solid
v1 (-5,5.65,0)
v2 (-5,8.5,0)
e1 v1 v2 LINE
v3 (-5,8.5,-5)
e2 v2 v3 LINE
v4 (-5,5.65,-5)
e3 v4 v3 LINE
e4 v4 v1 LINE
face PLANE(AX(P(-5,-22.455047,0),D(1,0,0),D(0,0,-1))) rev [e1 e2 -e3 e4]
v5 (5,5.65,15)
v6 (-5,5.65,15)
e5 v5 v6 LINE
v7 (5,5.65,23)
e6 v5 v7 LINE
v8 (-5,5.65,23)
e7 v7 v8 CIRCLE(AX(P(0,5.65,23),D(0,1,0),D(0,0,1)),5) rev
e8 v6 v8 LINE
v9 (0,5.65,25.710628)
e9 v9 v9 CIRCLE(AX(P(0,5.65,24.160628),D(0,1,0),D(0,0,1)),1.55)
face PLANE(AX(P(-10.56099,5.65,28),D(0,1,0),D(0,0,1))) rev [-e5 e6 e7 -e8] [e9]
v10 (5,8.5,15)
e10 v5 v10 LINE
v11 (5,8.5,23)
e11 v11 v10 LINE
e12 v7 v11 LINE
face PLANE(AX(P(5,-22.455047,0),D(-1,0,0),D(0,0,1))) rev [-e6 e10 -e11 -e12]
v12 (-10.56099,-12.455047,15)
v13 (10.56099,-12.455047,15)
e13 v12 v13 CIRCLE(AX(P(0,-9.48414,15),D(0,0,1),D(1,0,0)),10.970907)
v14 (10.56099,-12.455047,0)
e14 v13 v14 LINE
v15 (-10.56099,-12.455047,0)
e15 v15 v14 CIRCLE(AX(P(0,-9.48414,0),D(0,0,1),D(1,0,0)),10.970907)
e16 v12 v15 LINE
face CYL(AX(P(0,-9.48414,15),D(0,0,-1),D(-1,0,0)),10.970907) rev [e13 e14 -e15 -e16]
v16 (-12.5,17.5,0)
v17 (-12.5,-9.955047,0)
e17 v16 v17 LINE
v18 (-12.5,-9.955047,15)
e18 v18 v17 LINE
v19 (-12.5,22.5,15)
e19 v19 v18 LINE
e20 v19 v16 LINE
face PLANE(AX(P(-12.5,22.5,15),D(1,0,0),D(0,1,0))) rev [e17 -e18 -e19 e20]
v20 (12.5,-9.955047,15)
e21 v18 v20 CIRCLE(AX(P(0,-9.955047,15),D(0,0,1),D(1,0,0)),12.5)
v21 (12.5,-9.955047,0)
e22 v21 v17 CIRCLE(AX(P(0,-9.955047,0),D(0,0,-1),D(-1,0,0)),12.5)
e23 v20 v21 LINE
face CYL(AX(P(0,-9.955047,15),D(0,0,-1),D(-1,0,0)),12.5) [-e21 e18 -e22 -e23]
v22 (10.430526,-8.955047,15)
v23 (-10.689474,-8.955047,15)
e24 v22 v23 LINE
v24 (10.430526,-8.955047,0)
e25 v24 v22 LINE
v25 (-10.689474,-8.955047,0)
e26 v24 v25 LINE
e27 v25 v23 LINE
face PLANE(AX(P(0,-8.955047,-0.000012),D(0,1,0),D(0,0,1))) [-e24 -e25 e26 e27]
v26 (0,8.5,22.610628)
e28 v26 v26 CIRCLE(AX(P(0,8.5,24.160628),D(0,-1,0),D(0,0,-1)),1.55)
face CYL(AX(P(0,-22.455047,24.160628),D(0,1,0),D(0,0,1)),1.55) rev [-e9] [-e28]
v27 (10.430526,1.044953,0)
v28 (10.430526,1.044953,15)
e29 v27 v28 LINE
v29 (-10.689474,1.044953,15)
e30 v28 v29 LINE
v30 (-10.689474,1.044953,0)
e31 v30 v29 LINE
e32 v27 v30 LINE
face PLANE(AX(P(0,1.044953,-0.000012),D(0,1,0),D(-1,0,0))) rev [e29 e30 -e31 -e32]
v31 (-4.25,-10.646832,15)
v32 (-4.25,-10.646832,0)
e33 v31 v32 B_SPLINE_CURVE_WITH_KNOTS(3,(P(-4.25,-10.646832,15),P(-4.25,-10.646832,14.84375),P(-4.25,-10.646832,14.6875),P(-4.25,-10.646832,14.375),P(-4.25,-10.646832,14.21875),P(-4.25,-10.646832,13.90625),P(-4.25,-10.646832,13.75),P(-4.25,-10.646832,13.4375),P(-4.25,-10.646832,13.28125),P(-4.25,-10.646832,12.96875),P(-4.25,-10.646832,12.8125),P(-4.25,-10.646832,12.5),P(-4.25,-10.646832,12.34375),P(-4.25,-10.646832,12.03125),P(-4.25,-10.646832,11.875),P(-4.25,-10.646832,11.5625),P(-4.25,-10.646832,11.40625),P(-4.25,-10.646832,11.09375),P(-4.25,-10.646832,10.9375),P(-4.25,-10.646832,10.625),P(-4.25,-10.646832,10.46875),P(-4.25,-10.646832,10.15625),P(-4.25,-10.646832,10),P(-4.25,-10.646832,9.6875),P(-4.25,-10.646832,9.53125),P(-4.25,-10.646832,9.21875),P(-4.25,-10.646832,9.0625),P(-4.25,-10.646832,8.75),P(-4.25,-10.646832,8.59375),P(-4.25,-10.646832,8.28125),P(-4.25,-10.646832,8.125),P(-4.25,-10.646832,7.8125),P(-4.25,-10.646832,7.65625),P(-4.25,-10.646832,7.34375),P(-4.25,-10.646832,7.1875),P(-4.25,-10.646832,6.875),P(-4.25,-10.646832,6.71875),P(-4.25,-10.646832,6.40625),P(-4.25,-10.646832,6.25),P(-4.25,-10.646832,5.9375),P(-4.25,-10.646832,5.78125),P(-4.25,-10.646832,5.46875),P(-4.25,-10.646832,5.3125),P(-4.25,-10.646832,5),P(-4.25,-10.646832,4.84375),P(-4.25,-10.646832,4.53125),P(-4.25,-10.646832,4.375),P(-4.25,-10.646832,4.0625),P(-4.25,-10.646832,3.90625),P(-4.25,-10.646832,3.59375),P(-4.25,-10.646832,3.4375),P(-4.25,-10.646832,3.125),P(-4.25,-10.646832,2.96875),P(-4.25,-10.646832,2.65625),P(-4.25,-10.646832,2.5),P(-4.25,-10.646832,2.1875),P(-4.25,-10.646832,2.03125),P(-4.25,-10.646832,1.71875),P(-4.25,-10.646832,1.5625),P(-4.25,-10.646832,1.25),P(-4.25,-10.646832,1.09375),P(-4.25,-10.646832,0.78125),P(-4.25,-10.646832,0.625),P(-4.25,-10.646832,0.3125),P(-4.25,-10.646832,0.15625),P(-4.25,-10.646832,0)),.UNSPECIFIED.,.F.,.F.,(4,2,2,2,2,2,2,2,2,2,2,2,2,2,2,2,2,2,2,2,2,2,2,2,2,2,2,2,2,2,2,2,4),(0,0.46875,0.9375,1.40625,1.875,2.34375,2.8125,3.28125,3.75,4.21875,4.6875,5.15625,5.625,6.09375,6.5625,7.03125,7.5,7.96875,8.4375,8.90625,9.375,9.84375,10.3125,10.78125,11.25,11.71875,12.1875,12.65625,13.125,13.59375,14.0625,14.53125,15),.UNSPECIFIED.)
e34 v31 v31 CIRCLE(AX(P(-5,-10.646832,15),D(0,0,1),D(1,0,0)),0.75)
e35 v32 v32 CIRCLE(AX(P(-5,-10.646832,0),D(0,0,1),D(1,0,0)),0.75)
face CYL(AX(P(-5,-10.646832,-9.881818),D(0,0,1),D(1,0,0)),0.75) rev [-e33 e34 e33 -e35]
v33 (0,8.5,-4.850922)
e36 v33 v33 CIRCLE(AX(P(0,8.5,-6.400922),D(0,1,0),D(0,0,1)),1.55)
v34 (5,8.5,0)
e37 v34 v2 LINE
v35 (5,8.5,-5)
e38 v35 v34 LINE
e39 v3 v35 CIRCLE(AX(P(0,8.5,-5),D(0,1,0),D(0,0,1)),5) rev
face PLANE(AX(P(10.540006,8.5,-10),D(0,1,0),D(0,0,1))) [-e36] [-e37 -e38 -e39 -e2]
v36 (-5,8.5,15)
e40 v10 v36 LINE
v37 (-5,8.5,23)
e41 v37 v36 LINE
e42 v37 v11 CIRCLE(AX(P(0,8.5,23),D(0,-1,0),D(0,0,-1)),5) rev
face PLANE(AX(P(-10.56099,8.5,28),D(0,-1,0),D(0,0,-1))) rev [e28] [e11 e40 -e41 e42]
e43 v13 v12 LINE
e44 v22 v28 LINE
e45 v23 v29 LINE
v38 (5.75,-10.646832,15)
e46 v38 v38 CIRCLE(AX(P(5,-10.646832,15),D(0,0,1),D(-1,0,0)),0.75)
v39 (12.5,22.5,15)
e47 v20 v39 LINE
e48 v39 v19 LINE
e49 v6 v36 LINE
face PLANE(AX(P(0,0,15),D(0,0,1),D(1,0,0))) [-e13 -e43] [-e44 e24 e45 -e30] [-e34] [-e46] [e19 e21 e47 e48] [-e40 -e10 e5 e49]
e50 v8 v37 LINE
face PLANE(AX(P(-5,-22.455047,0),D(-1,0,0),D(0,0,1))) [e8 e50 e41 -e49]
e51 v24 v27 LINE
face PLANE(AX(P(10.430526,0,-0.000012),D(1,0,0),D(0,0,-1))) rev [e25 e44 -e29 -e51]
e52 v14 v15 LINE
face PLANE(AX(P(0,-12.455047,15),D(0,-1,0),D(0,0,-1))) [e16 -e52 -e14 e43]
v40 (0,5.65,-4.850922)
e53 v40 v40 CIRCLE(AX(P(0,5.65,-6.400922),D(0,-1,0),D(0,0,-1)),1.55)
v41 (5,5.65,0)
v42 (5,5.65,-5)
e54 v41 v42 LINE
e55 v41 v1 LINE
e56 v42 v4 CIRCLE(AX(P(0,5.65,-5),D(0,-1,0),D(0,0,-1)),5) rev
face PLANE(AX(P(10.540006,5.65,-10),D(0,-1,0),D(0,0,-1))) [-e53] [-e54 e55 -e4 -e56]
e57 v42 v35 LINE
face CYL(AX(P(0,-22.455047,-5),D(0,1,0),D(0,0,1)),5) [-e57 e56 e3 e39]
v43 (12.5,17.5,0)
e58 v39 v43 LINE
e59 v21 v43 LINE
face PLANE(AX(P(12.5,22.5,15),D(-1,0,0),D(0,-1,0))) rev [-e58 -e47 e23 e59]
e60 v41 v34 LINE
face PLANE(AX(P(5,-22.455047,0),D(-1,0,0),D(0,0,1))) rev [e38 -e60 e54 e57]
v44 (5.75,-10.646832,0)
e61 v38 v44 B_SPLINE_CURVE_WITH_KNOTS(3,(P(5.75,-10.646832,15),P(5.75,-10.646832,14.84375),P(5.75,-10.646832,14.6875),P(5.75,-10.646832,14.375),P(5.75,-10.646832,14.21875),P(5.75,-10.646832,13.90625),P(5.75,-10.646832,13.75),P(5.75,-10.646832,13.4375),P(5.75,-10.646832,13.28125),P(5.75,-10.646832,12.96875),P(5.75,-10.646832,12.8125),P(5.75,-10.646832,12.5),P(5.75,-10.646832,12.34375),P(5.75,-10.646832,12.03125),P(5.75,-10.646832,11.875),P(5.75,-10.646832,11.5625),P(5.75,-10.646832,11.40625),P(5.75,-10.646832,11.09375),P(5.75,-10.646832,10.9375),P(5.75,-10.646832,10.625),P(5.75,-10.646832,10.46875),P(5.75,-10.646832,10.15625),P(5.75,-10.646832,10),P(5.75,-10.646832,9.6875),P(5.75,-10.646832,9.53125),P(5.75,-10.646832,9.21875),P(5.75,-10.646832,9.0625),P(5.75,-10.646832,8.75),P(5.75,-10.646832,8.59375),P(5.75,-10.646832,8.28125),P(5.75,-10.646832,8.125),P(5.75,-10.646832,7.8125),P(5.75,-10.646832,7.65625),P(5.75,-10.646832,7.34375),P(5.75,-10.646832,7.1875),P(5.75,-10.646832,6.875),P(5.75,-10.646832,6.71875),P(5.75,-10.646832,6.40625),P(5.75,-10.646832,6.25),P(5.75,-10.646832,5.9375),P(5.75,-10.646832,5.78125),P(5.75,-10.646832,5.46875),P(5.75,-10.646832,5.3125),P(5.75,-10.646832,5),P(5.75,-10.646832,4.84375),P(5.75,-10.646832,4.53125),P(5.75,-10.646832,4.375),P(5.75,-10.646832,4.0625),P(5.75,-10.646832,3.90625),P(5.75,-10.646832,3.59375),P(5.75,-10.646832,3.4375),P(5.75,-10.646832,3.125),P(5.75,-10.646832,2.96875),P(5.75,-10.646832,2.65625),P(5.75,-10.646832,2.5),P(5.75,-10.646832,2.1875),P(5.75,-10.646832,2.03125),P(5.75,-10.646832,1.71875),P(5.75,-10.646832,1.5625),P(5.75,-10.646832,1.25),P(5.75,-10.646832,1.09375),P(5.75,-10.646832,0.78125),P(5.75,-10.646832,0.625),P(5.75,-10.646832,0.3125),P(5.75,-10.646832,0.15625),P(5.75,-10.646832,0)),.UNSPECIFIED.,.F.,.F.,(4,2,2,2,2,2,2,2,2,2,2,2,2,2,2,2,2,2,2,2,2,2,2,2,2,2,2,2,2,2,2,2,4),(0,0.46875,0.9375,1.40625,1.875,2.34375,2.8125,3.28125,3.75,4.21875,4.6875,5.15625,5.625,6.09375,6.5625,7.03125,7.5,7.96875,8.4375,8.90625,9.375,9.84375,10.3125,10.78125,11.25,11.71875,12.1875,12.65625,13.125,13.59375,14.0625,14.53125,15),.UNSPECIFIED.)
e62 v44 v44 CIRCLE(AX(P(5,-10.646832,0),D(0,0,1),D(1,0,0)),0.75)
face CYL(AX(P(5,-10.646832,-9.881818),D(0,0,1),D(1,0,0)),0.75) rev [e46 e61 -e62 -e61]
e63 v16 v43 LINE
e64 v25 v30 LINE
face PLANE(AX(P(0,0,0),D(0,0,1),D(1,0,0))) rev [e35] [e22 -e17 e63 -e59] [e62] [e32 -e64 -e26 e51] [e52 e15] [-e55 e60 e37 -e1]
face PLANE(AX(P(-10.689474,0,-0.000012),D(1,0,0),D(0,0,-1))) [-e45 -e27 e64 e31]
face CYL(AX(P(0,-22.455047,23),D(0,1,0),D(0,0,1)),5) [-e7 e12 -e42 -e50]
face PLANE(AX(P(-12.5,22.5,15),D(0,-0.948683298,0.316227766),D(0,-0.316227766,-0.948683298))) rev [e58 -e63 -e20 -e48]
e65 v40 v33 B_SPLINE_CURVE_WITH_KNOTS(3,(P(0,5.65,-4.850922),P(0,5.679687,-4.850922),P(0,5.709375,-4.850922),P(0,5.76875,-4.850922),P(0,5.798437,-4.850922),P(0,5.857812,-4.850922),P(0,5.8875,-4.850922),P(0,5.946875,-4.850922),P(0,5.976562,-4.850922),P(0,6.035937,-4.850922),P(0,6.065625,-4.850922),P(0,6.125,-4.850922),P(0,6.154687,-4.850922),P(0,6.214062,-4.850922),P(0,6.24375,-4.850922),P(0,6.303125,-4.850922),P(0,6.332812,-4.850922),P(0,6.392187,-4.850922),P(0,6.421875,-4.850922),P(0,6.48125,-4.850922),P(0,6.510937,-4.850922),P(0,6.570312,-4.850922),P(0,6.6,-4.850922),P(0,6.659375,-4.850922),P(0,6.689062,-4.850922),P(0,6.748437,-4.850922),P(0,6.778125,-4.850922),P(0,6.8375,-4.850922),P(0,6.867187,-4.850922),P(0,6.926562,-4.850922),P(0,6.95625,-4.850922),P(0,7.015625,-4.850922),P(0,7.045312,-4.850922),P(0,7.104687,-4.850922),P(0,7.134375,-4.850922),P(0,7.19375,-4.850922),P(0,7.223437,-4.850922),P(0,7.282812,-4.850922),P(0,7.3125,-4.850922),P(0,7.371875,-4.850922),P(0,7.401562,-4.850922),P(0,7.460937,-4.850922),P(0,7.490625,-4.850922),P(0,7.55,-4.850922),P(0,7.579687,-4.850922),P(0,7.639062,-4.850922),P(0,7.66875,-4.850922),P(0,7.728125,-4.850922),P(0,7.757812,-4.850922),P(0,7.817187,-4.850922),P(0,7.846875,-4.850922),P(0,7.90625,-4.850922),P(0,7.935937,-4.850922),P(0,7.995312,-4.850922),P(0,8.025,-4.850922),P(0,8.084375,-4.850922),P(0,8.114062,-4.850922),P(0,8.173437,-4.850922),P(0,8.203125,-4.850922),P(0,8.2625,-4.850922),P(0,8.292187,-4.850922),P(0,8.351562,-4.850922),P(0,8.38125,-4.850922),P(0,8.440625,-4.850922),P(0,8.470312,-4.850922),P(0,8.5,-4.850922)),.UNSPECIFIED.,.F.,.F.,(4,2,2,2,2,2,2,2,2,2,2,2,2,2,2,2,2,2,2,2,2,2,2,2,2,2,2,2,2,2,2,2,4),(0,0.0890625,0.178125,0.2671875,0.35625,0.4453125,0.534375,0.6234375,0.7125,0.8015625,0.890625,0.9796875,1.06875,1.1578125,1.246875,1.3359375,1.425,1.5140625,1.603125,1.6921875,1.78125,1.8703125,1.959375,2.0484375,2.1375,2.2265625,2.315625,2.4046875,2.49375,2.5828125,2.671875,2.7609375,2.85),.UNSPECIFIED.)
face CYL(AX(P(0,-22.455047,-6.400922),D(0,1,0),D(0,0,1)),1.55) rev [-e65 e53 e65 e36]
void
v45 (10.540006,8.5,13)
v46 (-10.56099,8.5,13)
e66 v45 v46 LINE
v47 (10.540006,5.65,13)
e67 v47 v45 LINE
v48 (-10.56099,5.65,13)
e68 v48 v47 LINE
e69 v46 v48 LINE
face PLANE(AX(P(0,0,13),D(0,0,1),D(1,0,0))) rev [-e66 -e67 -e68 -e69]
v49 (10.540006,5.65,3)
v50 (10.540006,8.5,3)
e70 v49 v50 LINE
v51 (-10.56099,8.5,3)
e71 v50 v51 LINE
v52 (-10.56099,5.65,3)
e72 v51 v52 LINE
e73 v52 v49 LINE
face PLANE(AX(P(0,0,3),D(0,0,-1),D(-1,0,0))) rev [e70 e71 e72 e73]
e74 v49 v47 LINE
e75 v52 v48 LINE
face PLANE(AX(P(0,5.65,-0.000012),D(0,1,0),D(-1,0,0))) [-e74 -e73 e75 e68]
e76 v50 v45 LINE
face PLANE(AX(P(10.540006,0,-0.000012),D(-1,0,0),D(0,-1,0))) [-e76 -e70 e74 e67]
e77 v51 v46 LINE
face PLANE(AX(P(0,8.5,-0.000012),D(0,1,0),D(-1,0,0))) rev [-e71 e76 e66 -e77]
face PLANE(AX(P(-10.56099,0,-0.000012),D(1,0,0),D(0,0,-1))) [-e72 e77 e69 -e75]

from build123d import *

# Parameters (mm, degrees)
SKETCH1_W                = 25
SKETCH1_H                = 45
BOSS_EXTRUDE1_DEPTH      = 15
BOSS_EXTRUDE2_START      = -10.05
BOSS_EXTRUDE2_DEPTH      = 20.1
CUT_EXTRUDE1_DEPTH       = 30.79093822
CUT_EXTRUDE1_DEPTH_BACK  = 30.79093822
CUT_EXTRUDE3_DEPTH       = 30.79093822
CUT_EXTRUDE3_DEPTH_BACK  = 30.79093822
CUT_EXTRUDE7_DEPTH       = 30.79093822
CUT_EXTRUDE9_OUTLINE_W   = 21.12
CUT_EXTRUDE9_OUTLINE_H   = 10
CUT_EXTRUDE9_OUTLINE_W_2 = 21.100995898
CUT_EXTRUDE9_OUTLINE_H_2 = 2.85
CUT_EXTRUDE9_DEPTH       = 15
SKETCH8_W                = 7
SKETCH8_H                = 2.5
BOSS_EXTRUDE3_DEPTH      = 10
CUT_EXTRUDE11_DEPTH      = 30.79093822
CUT_EXTRUDE11_DEPTH_BACK = 30.79093822
CUT_EXTRUDE12_DEPTH      = 30.79093822
CUT_EXTRUDE12_DEPTH_BACK = 30.79093822
SKETCH10_R               = 1.6
CUT_EXTRUDE14_DEPTH      = 30.79093822
CUT_EXTRUDE14_DEPTH_BACK = 30.79093822
SKETCH12_R               = 0.75
CUT_EXTRUDE15_DEPTH      = 30.79093822
CUT_EXTRUDE15_DEPTH_BACK = 30.79093822
SKETCH15_W               = 15.416816506
SKETCH15_H               = 10.763431908
BOSS_EXTRUDE5_START      = 3
SKETCH16_W               = 21.100995898
SKETCH16_H               = 2.85
BOSS_EXTRUDE5_DEPTH      = 13
CUT_EXTRUDE17_DEPTH      = 30.79093822
CUT_EXTRUDE17_DEPTH_BACK = 30.79093822
SKETCH17_R               = 1.55
BOSS_EXTRUDE6_START      = 13
SKETCH18_W               = 21.100995898
SKETCH18_H               = 2.85
BOSS_EXTRUDE6_DEPTH      = 15
CUT_EXTRUDE18_DEPTH      = 39.032880511
CUT_EXTRUDE18_DEPTH_BACK = 39.032880511
SKETCH19_R               = 1.55


# Read off the part's stored shape, not the designer's step: Cut-Extrude9
with BuildPart() as part:
    # Sketch1 → Boss-Extrude1 (new body)
    with BuildSketch(Plane.XY):
        Rectangle(SKETCH1_W, SKETCH1_H)
    extrude(amount=BOSS_EXTRUDE1_DEPTH)

    # Sketch2 → Boss-Extrude2 (add)
    with BuildSketch(Plane(origin=(0, 0, 0), x_dir=(0, 0, -1), z_dir=(1, 0, 0)).offset(BOSS_EXTRUDE2_START)):
        Polygon((-15, 22.5), (-15, 21.775067879), (0, 22.5), align=None)
    extrude(amount=BOSS_EXTRUDE2_DEPTH)

    # Sketch3 → Cut-Extrude1 (cut, two sides: drawn at the far end of the back side and taken through both)
    with BuildSketch(Plane(origin=(0, 0, 0), x_dir=(0, 0, -1), z_dir=(1, 0, 0)).offset(-CUT_EXTRUDE1_DEPTH_BACK)):
        Polygon((-15, 22.5), (0, 17.5), (5.857225601, 19.69853849), (5.857225601, 28.456051758), (-15, 27.780768739), align=None)
    extrude(amount=CUT_EXTRUDE1_DEPTH + CUT_EXTRUDE1_DEPTH_BACK, mode=Mode.SUBTRACT)

    # Sketch4 → Cut-Extrude3 (cut, two sides: drawn at the far end of the back side and taken through both)
    with BuildSketch(Plane.XY.offset(-CUT_EXTRUDE3_DEPTH_BACK)):
        with BuildLine():
            Line((-17.124140969, -24.670147455), (0, -24.921234566))
            Line((0, -24.921234566), (0, -22.455047029))
            ThreePointArc((0, -22.455047029), (-8.838834765, -18.793881794), (-12.5, -9.955047029))
            Line((-12.5, -9.955047029), (-17.124140969, -24.670147455))
        make_face()
        with BuildLine():
            Line((0, -22.455047029), (0, -24.921234566))
            Line((0, -24.921234566), (18.053725517, -25.185951949))
            Line((18.053725517, -25.185951949), (12.5, -9.955047029))
            ThreePointArc((12.5, -9.955047029), (8.838834765, -18.793881794), (0, -22.455047029))
        make_face()
    extrude(amount=CUT_EXTRUDE3_DEPTH + CUT_EXTRUDE3_DEPTH_BACK, mode=Mode.SUBTRACT)

    # Sketch5 → Cut-Extrude7 (cut, through all)
    with BuildSketch(Plane.XY):
        with BuildLine():
            Line((10.560989946, -12.455047029), (-10.560989946, -12.455047029))
            ThreePointArc((-10.560989946, -12.455047029), (0, -20.455047029), (10.560989946, -12.455047029))
        make_face()
    extrude(amount=CUT_EXTRUDE7_DEPTH, mode=Mode.SUBTRACT)

    # Cut-Extrude9 outline → Cut-Extrude9 (cut)
    with BuildSketch(Plane.XY):
        with Locations((-0.129474346, -3.955047029)):
            Rectangle(CUT_EXTRUDE9_OUTLINE_W, CUT_EXTRUDE9_OUTLINE_H)
        with Locations((-0.010491997, 7.075)):
            Rectangle(CUT_EXTRUDE9_OUTLINE_W_2, CUT_EXTRUDE9_OUTLINE_H_2)
    extrude(amount=CUT_EXTRUDE9_DEPTH, mode=Mode.SUBTRACT)

    # Sketch8 → Boss-Extrude3 (add)
    with BuildSketch(Plane.XY):
        with Locations((0, 4.4)):
            Rectangle(SKETCH8_W, SKETCH8_H)
    extrude(amount=-BOSS_EXTRUDE3_DEPTH)

    # Sketch9 → Cut-Extrude11 (cut, two sides: drawn at the far end of the back side and taken through both)
    with BuildSketch(Plane(origin=(0, 0, 0), x_dir=(1, 0, 0), z_dir=(0, 1, 0)).offset(-CUT_EXTRUDE11_DEPTH_BACK)):
        with BuildLine():
            Line((-5.143587348, 10.809031185), (-3.492186712, 6.389631225))
            ThreePointArc((-3.492186712, 6.389631225), (0, 9.881817937), (3.492186712, 6.389631225))
            ThreePointArc((3.492186712, 6.389631225), (3.488488867, 6.228965567), (3.477403165, 6.068640163))
            Line((3.477403165, 6.068640163), (6.889064643, 10.549066481))
            Line((6.889064643, 10.549066481), (-5.143587348, 10.809031185))
        make_face()
    extrude(amount=CUT_EXTRUDE11_DEPTH + CUT_EXTRUDE11_DEPTH_BACK, mode=Mode.SUBTRACT)

    # Sketch10 → Cut-Extrude12 (cut, two sides: drawn at the far end of the back side and taken through both)
    with BuildSketch(Plane(origin=(0, 0, 0), x_dir=(1, 0, 0), z_dir=(0, 1, 0)).offset(-CUT_EXTRUDE12_DEPTH_BACK)):
        with Locations((0, 6.891628676)):
            Circle(SKETCH10_R)
        with BuildLine():
            ThreePointArc((1.6, 6.891628676), (0, 5.291628676), (-1.6, 6.891628676))
            Line((-1.6, 6.891628676), (-1.6, 0))
            Line((-1.6, 0), (1.6, 0))
            Line((1.6, 0), (1.6, 6.891628676))
        make_face()
    extrude(amount=CUT_EXTRUDE12_DEPTH + CUT_EXTRUDE12_DEPTH_BACK, mode=Mode.SUBTRACT)

    # Sketch12 → Cut-Extrude14 (cut, two sides: drawn at the far end of the back side and taken through both)
    with BuildSketch(Plane.XY.offset(-CUT_EXTRUDE14_DEPTH_BACK)):
        with Locations((-5, -10.646832198)):
            Circle(SKETCH12_R)
        with Locations((5, -10.646832198)):
            Circle(SKETCH12_R)
    extrude(amount=CUT_EXTRUDE14_DEPTH + CUT_EXTRUDE14_DEPTH_BACK, mode=Mode.SUBTRACT)

    # Sketch15 → Cut-Extrude15 (cut, two sides: drawn at the far end of the back side and taken through both)
    with BuildSketch(Plane(origin=(0, 0, 0), x_dir=(1, 0, 0), z_dir=(0, 1, 0)).offset(-CUT_EXTRUDE15_DEPTH_BACK)):
        with Locations((0.052797317, 5.381715954)):
            Rectangle(SKETCH15_W, SKETCH15_H)
    extrude(amount=CUT_EXTRUDE15_DEPTH + CUT_EXTRUDE15_DEPTH_BACK, mode=Mode.SUBTRACT)

    # Sketch16 → Boss-Extrude5 (add)
    with BuildSketch(Plane.XY.offset(BOSS_EXTRUDE5_START)):
        with Locations((-0.010491997, 7.075)):
            Rectangle(SKETCH16_W, SKETCH16_H)
    extrude(amount=-BOSS_EXTRUDE5_DEPTH)

    # Sketch17 → Cut-Extrude17 (cut, two sides: drawn at the far end of the back side and taken through both)
    with BuildSketch(Plane(origin=(0, 0, 0), x_dir=(1, 0, 0), z_dir=(0, 1, 0)).offset(-CUT_EXTRUDE17_DEPTH_BACK)):
        with Locations(Location((0, 6.400921521, 0), (0, 0, 270))):
            Circle(SKETCH17_R)
        with BuildLine():
            Line((5, 5), (5, 0))
            Line((5, 0), (12.5, 0))
            Line((12.5, 0), (12.436231279, 14.247241291))
            Line((12.436231279, 14.247241291), (-13.710360946, 14.247241291))
            Line((-13.710360946, 14.247241291), (-13.710360946, 0))
            Line((-13.710360946, 0), (-5, 0))
            Line((-5, 0), (-5, 5))
            ThreePointArc((-5, 5), (-3.535533906, 8.535533906), (0, 10))
            ThreePointArc((0, 10), (3.535533906, 8.535533906), (5, 5))
        make_face()
    extrude(amount=CUT_EXTRUDE17_DEPTH + CUT_EXTRUDE17_DEPTH_BACK, mode=Mode.SUBTRACT)

    # Sketch18 → Boss-Extrude6 (add)
    with BuildSketch(Plane.XY.offset(BOSS_EXTRUDE6_START)):
        with Locations((-0.010491997, 7.075)):
            Rectangle(SKETCH18_W, SKETCH18_H)
    extrude(amount=BOSS_EXTRUDE6_DEPTH)

    # Sketch19 → Cut-Extrude18 (cut, two sides: drawn at the far end of the back side and taken through both)
    with BuildSketch(Plane(origin=(0, 0, 0), x_dir=(1, 0, 0), z_dir=(0, 1, 0)).offset(-CUT_EXTRUDE18_DEPTH_BACK)):
        with Locations(Location((0, -24.160628435, 0), (0, 0, 270))):
            Circle(SKETCH19_R)
        with BuildLine():
            Line((-5, -23), (-5, -15))
            Line((-5, -15), (-19.938016683, -15))
            Line((-19.938016683, -15), (-19.938016683, -28.423127273))
            Line((-19.938016683, -28.423127273), (20.151320265, -28.423127273))
            Line((20.151320265, -28.423127273), (20.151320265, -15))
            Line((20.151320265, -15), (5, -15))
            Line((5, -15), (5, -23))
            ThreePointArc((5, -23), (0, -28), (-5, -23))
        make_face()
    extrude(amount=CUT_EXTRUDE18_DEPTH + CUT_EXTRUDE18_DEPTH_BACK, mode=Mode.SUBTRACT)


solid = part.part
